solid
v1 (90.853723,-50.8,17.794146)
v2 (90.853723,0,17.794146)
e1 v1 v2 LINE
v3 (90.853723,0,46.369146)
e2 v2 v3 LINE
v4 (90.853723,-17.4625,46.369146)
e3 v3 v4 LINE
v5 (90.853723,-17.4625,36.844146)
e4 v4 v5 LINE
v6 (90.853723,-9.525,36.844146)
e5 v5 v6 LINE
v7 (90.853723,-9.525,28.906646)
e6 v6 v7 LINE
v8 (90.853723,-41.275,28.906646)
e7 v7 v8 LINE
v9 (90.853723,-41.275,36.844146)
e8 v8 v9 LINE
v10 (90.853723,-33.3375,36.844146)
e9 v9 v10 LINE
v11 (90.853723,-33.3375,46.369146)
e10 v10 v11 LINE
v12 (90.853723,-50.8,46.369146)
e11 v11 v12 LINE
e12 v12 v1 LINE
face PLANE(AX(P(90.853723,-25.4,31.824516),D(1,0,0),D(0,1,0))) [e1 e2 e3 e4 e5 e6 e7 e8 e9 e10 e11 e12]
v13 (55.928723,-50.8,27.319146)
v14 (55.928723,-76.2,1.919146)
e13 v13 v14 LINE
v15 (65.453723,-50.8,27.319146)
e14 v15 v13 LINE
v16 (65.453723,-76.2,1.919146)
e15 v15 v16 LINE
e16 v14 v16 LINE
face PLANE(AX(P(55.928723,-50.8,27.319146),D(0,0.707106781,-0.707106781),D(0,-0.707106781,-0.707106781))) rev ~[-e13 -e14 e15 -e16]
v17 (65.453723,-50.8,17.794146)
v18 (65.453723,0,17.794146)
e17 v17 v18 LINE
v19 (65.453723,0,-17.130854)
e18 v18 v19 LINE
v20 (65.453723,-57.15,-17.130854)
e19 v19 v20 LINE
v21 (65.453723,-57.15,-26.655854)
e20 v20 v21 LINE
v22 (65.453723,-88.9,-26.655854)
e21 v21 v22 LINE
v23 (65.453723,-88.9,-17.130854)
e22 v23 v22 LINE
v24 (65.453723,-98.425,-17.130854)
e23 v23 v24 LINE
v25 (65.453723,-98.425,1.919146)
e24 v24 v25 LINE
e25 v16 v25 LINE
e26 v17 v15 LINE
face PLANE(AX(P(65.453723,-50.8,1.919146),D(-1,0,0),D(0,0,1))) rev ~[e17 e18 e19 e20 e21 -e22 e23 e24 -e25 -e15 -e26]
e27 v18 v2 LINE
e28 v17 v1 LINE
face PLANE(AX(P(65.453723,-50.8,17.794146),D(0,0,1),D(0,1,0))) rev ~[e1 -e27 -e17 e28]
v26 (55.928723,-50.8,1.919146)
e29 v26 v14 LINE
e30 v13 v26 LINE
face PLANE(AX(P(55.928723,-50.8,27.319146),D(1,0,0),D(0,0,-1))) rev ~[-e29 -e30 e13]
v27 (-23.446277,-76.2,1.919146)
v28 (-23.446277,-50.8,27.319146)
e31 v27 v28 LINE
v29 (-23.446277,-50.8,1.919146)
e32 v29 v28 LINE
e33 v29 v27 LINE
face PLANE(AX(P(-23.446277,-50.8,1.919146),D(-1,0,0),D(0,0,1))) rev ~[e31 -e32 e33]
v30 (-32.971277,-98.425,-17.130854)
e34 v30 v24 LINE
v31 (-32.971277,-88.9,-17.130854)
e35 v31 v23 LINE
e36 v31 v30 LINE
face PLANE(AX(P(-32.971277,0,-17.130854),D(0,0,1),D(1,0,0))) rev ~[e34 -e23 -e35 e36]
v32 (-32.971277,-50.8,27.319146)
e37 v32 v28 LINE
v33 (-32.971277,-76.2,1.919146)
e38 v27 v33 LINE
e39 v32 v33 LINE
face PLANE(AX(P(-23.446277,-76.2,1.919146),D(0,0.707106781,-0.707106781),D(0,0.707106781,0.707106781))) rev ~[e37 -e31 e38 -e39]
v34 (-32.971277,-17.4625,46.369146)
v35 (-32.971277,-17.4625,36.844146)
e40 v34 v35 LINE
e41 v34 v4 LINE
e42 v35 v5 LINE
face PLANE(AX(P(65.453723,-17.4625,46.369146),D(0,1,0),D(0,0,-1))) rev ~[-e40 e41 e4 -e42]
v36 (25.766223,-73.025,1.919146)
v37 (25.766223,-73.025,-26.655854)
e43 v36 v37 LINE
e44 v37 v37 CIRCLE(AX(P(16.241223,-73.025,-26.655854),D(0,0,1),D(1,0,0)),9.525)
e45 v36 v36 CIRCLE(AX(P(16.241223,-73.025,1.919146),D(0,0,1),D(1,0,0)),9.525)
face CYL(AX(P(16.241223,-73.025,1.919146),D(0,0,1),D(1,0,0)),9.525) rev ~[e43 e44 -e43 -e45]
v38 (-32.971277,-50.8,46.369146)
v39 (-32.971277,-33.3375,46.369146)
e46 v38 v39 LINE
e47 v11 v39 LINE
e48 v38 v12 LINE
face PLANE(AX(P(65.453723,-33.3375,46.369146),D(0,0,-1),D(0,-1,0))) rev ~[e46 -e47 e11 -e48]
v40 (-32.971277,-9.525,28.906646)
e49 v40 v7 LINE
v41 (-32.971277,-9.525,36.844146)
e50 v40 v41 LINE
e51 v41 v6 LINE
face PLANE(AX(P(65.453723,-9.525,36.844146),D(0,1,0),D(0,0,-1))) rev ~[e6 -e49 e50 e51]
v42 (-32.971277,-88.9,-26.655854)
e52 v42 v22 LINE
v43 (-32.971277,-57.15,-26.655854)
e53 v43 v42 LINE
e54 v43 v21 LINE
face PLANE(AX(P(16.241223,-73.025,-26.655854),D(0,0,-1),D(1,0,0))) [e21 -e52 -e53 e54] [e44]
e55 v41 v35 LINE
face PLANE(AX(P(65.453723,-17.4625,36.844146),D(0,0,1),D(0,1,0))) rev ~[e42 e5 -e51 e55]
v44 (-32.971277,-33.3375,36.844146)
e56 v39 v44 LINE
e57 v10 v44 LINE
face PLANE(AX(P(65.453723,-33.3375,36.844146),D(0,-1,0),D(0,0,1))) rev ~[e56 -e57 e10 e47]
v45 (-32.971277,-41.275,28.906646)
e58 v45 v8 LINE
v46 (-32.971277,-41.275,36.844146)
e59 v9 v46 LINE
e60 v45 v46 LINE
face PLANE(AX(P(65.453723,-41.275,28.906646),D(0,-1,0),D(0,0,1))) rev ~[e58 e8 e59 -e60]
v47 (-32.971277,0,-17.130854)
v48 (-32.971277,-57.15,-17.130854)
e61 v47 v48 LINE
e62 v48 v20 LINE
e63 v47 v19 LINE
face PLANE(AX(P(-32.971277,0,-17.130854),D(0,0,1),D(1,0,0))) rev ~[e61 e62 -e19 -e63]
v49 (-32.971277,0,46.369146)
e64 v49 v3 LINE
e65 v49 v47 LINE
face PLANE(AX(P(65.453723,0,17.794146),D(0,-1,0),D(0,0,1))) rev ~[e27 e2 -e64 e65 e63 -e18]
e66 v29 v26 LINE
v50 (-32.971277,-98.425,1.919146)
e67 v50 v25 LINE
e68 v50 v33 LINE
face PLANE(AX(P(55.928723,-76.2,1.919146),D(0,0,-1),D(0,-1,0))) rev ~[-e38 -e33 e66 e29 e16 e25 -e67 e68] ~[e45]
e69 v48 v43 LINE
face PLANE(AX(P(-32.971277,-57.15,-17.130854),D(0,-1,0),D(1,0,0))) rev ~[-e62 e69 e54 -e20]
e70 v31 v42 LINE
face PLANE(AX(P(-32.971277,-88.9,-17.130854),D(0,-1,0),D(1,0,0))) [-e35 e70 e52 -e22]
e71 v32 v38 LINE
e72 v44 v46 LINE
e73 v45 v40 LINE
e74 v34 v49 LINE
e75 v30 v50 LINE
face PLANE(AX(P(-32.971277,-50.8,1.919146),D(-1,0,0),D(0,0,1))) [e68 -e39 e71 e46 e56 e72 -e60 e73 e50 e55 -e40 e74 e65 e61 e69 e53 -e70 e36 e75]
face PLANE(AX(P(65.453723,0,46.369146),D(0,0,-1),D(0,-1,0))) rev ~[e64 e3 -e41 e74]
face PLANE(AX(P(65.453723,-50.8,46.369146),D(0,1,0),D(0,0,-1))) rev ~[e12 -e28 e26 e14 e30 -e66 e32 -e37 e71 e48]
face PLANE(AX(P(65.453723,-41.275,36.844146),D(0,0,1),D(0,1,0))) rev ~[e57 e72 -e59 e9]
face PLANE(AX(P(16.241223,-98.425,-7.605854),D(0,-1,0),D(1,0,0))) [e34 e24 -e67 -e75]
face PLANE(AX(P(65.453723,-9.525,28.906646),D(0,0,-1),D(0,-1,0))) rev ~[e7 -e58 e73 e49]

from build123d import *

# Parameters (mm, degrees)
F0_W      = 98.425
F0_H      = 19.05
F1_DEPTH  = 98.425
F2_W      = 98.425
F2_H      = 31.75
F3_DEPTH  = 9.525
F5_DEPTH  = 58.928
F6_W      = 98.425
F6_H      = 50.8
F7_DEPTH  = 44.45
F8_W      = 98.425
F8_H      = 15.875
F9_DEPTH  = 17.4625
F10_W     = 7.9375
F10_H     = 7.9375
F11_DEPTH = 104.394
F13_DEPTH = 25.4
F14_W     = 9.525
F14_H     = 25.4
F15_DEPTH = 31.242
F17_DEPTH = 25.4
F19_DEPTH = 39.878
F21_DEPTH = 25.4


with BuildPart() as f1:
    # F0 (on Front) → F1 (new body)
    with BuildSketch(Plane.XZ):
        with Locations((16.241223073, -7.6058536083)):
            Rectangle(F0_W, F0_H)
    extrude(amount=F1_DEPTH)

    # F2 (on face) → F3 (join)
    with BuildSketch(Plane(origin=(0, 0, -17.1308536083), x_dir=(1, 0, 0), z_dir=(0, 0, -1))):
        with Locations((16.241223073, 73.025)):
            Rectangle(F2_W, F2_H)
    extrude(amount=F3_DEPTH)

    # F4 (on face) → F5 (cut)
    with BuildSketch(Plane.XY.offset(1.9191463917)):
        with BuildLine():
            ThreePointArc((16.241223073, -82.55), (22.9764151638, -79.7601920908), (25.766223073, -73.025))
            ThreePointArc((25.766223073, -73.025), (9.5060309822, -66.2898079092), (16.241223073, -82.55))
        make_face()
    extrude(amount=-F5_DEPTH, mode=Mode.SUBTRACT)

    # F6 (on face) → F7 (join)
    with BuildSketch(Plane.XY.offset(1.9191463917)):
        with Locations((16.241223073, -25.4)):
            Rectangle(F6_W, F6_H)
    extrude(amount=F7_DEPTH)

    # F8 (on face) → F9 (cut)
    with BuildSketch(Plane.XY.offset(46.3691463917)):
        with Locations((16.241223073, -25.4)):
            Rectangle(F8_W, F8_H)
    extrude(amount=-F9_DEPTH, mode=Mode.SUBTRACT)

    # F10 (on face) → F11 (cut)
    with BuildSketch(Plane(origin=(-32.971276927, 0, 0), x_dir=(0, -1, 0), z_dir=(-1, 0, 0))):
        with Locations((13.49375, 32.8753963917)):
            Rectangle(F10_W, F10_H)
        with Locations((37.30625, 32.8753963917)):
            Rectangle(F10_W, F10_H)
    extrude(amount=-F11_DEPTH, mode=Mode.SUBTRACT)

    # F12 (on face) → F13 (join)
    with BuildSketch(Plane.YZ.offset(65.453723073)):
        Polygon((-33.3375, 46.3691463917), (-50.8, 46.3691463917), (-50.8, 17.7941463917), (0, 17.7941463917), (0, 46.3691463917), (-17.4625, 46.3691463917), (-17.4625, 36.8441463917), (-9.525, 36.8441463917), (-9.525, 28.9066463917), (-41.275, 28.9066463917), (-41.275, 36.8441463917), (-33.3375, 36.8441463917), align=None)
    extrude(amount=F13_DEPTH)

    # F14 (on face) → F15 (join)
    with BuildSketch(Plane.XZ.offset(50.8)):
        with Locations((-28.208776927, 14.6191463917)):
            Rectangle(F14_W, F14_H)
    extrude(amount=F15_DEPTH)

    # F16 (on face) → F17 (cut)
    with BuildSketch(Plane.YZ.offset(-23.446276927)):
        Polygon((-76.2, 1.9191463917), (-50.8, 27.3191463917), (-82.042, 27.3191463917), (-82.042, 1.9191463917), align=None)
    extrude(amount=-F17_DEPTH, mode=Mode.SUBTRACT)

    # F18 (on face) → F19 (join)
    with BuildSketch(Plane.XZ.offset(50.8)):
        Polygon((55.928723073, 1.9191463917), (65.453723073, 1.9191463917), (65.453723073, 17.7941463917), (65.453723073, 27.3191463917), (55.928723073, 27.3191463917), align=None)
    extrude(amount=F19_DEPTH)

    # F20 (on face) → F21 (cut)
    with BuildSketch(Plane(origin=(55.928723073, 0, 0), x_dir=(0, -1, 0), z_dir=(-1, 0, 0))):
        Polygon((90.678, 27.3191463917), (50.8, 27.3191463917), (76.2, 1.9191463917), (90.678, 1.9191463917), align=None)
    extrude(amount=-F21_DEPTH, mode=Mode.SUBTRACT)


solid = f1.part
